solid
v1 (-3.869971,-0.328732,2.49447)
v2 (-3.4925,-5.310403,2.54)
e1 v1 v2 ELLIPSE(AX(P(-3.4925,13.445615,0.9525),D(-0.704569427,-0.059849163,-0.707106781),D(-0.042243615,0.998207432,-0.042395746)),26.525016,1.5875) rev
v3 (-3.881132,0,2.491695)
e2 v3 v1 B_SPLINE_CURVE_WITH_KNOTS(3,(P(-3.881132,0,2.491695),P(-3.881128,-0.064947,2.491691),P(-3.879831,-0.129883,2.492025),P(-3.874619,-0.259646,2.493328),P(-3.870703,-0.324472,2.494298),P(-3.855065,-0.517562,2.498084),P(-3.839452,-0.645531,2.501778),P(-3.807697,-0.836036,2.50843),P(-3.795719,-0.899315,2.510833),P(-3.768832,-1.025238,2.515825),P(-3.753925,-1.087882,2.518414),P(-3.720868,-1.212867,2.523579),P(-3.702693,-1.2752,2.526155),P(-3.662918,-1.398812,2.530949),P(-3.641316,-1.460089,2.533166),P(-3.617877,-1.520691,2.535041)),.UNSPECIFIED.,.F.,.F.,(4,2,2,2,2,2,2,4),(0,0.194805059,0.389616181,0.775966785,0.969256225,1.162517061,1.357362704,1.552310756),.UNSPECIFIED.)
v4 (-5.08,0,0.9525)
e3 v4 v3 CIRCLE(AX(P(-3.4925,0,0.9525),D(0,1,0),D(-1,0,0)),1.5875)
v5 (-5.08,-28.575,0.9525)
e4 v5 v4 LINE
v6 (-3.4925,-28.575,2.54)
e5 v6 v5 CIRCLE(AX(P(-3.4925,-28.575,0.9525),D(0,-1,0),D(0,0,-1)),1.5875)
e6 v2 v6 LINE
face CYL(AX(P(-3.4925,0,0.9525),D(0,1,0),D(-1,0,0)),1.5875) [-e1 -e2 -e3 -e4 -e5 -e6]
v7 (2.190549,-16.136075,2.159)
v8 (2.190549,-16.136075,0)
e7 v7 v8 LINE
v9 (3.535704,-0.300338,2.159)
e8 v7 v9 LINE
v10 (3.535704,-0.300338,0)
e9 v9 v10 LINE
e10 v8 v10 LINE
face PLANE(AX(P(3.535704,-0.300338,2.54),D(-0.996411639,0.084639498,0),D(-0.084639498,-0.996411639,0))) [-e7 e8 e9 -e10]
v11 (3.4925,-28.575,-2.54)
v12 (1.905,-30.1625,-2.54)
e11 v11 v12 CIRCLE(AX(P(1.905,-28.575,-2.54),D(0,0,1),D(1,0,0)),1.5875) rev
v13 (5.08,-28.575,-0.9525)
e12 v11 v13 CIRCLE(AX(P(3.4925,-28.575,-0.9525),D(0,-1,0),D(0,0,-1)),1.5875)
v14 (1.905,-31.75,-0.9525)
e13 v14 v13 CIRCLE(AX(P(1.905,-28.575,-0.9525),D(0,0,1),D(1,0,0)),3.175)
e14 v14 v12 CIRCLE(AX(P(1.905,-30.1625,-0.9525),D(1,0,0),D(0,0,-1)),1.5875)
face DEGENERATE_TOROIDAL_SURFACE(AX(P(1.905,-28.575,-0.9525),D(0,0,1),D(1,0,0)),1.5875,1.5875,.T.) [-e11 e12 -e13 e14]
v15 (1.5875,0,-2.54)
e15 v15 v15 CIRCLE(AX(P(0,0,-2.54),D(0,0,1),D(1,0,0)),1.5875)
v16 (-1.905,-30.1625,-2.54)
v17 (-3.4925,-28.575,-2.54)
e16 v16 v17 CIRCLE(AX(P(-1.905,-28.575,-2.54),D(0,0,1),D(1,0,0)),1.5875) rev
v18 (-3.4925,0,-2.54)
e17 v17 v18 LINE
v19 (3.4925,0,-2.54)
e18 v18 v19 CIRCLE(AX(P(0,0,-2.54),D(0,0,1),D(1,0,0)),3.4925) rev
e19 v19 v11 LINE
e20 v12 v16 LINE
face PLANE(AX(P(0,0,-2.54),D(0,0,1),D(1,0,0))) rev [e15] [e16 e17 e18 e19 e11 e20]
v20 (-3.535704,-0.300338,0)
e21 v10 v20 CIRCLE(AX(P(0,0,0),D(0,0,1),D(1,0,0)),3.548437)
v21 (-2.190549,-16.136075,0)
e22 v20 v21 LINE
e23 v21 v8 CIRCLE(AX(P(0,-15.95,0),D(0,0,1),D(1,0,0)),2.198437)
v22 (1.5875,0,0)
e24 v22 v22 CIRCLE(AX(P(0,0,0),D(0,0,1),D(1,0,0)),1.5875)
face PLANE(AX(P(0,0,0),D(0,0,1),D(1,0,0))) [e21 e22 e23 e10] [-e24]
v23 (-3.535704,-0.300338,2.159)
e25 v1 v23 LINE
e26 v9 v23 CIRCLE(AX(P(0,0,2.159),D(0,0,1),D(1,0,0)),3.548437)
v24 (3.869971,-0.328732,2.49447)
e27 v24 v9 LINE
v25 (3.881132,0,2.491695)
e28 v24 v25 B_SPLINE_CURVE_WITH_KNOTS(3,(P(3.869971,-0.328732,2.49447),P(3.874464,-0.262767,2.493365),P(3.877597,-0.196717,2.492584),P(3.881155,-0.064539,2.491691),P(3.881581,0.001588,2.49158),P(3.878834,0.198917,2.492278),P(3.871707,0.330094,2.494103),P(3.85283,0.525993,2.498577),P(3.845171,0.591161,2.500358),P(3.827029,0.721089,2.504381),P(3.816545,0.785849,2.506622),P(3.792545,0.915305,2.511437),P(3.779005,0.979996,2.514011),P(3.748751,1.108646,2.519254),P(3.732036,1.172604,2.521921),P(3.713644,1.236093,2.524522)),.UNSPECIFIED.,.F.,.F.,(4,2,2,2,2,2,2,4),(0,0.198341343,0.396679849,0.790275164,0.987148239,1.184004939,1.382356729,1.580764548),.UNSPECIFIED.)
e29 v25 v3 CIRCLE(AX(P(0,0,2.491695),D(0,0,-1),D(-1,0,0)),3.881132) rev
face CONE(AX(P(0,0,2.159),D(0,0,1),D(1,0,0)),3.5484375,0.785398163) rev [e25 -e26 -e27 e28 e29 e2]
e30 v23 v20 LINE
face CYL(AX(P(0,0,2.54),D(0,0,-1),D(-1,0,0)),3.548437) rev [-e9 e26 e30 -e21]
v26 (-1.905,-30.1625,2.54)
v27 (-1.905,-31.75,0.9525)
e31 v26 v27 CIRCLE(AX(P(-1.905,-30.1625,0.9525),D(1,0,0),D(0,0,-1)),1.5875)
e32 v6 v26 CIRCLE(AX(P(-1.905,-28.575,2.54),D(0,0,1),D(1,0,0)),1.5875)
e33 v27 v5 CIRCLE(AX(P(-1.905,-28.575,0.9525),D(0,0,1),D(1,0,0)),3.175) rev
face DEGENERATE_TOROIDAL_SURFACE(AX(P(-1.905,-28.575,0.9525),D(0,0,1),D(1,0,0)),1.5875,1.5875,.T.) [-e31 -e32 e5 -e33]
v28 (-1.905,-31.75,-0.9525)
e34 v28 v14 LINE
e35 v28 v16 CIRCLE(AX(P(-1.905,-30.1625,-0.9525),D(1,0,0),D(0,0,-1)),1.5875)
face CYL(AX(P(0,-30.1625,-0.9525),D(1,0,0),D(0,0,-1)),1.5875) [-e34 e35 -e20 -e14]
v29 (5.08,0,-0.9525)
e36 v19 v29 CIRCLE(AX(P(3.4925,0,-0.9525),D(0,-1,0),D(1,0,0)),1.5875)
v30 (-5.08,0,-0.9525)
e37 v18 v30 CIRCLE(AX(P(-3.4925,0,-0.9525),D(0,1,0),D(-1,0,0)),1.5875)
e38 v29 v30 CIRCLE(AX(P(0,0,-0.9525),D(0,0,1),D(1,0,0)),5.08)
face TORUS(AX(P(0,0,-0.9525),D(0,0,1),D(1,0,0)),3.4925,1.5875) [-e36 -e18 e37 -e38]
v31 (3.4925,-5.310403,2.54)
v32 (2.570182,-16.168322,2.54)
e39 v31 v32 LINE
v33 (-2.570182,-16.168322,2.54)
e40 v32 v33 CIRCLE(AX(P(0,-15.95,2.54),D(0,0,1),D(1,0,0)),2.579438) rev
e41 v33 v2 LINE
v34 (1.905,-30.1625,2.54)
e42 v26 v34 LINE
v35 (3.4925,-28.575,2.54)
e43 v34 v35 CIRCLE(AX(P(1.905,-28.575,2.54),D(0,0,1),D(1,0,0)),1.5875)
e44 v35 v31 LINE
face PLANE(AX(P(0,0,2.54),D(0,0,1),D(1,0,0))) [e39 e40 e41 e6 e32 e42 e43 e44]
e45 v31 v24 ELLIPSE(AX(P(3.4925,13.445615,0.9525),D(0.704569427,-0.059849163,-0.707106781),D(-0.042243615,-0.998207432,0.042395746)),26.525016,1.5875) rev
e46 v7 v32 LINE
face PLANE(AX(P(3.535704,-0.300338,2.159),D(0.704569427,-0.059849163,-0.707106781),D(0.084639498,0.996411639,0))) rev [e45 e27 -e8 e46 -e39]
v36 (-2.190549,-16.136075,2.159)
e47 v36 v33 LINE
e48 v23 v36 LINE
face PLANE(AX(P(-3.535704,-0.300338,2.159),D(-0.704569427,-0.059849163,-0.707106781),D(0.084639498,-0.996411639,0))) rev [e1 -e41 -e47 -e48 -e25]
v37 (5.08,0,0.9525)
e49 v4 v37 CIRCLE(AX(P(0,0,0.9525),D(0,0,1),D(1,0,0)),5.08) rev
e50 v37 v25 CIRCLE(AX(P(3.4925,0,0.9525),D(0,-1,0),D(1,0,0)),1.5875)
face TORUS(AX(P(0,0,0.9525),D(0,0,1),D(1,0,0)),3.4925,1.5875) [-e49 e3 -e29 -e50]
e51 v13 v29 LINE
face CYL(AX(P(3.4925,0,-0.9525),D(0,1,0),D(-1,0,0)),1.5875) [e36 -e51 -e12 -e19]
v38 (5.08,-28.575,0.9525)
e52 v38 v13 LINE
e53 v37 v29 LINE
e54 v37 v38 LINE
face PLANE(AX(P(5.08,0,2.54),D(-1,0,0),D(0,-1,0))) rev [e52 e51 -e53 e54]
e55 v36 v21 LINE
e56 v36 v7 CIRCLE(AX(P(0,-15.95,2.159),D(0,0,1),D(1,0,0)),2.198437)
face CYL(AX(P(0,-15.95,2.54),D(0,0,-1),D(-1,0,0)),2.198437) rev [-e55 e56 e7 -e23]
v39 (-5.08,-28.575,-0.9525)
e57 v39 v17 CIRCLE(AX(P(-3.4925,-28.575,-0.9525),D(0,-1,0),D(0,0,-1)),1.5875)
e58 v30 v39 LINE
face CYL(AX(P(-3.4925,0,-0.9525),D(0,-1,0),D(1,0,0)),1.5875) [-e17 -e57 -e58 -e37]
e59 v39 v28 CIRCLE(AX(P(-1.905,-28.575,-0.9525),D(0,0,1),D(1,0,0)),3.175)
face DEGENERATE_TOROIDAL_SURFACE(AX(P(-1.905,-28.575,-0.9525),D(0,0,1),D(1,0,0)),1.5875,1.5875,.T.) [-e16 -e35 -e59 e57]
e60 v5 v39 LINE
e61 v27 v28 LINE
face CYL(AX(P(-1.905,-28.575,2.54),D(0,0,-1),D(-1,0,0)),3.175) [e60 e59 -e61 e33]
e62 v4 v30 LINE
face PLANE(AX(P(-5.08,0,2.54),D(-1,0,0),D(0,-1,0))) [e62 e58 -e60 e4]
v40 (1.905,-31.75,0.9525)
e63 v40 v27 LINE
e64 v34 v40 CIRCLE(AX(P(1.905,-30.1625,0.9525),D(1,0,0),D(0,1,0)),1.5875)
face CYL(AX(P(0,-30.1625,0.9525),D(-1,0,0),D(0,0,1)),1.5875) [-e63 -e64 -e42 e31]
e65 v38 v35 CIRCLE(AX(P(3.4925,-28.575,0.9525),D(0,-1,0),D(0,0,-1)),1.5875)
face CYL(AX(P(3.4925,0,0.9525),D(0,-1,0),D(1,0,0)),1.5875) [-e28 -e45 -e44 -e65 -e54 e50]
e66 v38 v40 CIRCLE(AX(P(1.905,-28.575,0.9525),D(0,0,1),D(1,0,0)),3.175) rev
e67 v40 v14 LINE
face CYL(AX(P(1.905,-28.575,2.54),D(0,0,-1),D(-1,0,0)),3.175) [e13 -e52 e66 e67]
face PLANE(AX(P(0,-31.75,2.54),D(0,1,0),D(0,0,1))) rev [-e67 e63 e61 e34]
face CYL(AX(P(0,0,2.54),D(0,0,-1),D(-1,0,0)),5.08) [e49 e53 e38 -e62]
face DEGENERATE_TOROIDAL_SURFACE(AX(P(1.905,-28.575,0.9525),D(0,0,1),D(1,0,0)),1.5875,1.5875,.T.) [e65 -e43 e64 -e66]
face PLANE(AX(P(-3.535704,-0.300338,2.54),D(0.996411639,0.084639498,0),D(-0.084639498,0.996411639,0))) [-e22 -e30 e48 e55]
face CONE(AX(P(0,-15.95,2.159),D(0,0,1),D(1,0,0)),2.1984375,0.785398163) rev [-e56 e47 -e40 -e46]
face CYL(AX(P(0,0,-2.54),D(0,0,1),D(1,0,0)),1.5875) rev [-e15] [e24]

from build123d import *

# Parameters (mm, degrees)
BOSS_EXTRUDE1_DEPTH = 2.54
BOSS_EXTRUDE2_START = -2.54
SKETCH1_3_R         = 1.5875
BOSS_EXTRUDE2_DEPTH = 2.54
CHAMFER1_SIZE       = 0.381
FILLET1_R           = 1.5875


with BuildPart() as part:
    # Sketch1 → Boss-Extrude1 (new body)
    with BuildSketch(Plane.XY):
        with BuildLine():
            Line((5.08, -28.575), (5.08, 0))
            ThreePointArc((5.08, 0), (0, 5.08), (-5.08, 0))
            Line((-5.08, 0), (-5.08, -28.575))
            ThreePointArc((-5.08, -28.575), (-4.15006403, -30.82006403), (-1.905, -31.75))
            Line((-1.905, -31.75), (1.905, -31.75))
            ThreePointArc((1.905, -31.75), (4.15006403, -30.82006403), (5.08, -28.575))
        make_face()
        with BuildLine():
            Line((-3.535704427, -0.30033797), (-2.190548714, -16.136074647))
            ThreePointArc((-2.190548714, -16.136074647), (-1.487288465, -17.568981304), (0, -18.1484375))
            ThreePointArc((0, -18.1484375), (1.487288465, -17.568981304), (2.190548714, -16.136074647))
            Line((2.190548714, -16.136074647), (3.535704427, -0.30033797))
            ThreePointArc((3.535704427, -0.30033797), (0, 3.5484375), (-3.535704427, -0.30033797))
        make_face(mode=Mode.SUBTRACT)
    extrude(amount=BOSS_EXTRUDE1_DEPTH)

    # Sketch1<3> → Boss-Extrude2 (add)
    with BuildSketch(Plane.XY.offset(BOSS_EXTRUDE2_START)):
        with BuildLine():
            ThreePointArc((1.905, -31.75), (4.15006403, -30.82006403), (5.08, -28.575))
            Line((5.08, -28.575), (5.08, 0))
            ThreePointArc((5.08, 0), (0, 5.08), (-5.08, 0))
            Line((-5.08, 0), (-5.08, -28.575))
            ThreePointArc((-5.08, -28.575), (-4.15006403, -30.82006403), (-1.905, -31.75))
            Line((-1.905, -31.75), (1.905, -31.75))
        make_face()
        Circle(SKETCH1_3_R, mode=Mode.SUBTRACT)
    extrude(amount=BOSS_EXTRUDE2_DEPTH)

    # Chamfer1
    chamfer1_edges = [part.edges().sort_by_distance(p)[0] for p in [
        (0, 3.5484375, 2.54),
        (2.86312657, -8.218206309, 2.54),
        (0, -18.1484375, 2.54),
        (-2.86312657, -8.218206309, 2.54),
    ]]
    chamfer(chamfer1_edges, length=CHAMFER1_SIZE)

    # Fillet1
    # the kernel refuses this fillet: 1.5875 mm, written as the material it takes off along each edge
    with BuildSketch(Plane(origin=(1.905, -28.575, 2.54), x_dir=(0, -1, 0), z_dir=(-1, 0, 0))) as fillet1_piece_1:
        with BuildLine():
            CenterArc((3.175 - FILLET1_R, -FILLET1_R), FILLET1_R, 0, 90)
            Line((3.175, -FILLET1_R), (3.175, 0))
            Line((3.175, 0), (3.175 - FILLET1_R, 0))
        make_face()
    revolve(axis=Axis((1.905, -28.575, 2.54), (0, 0, 1)), revolution_arc=90, mode=Mode.SUBTRACT)
    with BuildSketch(Plane(origin=(-1.905, -28.575, 2.54), x_dir=(-1, 0, 0), z_dir=(0, 1, 0))) as fillet1_piece_2:
        with BuildLine():
            CenterArc((3.175 - FILLET1_R, -FILLET1_R), FILLET1_R, 0, 90)
            Line((3.175, -FILLET1_R), (3.175, 0))
            Line((3.175, 0), (3.175 - FILLET1_R, 0))
        make_face()
    revolve(axis=Axis((-1.905, -28.575, 2.54), (0, 0, 1)), revolution_arc=90, mode=Mode.SUBTRACT)
    with BuildSketch(Plane(origin=(-5.08, 0, 2.54), x_dir=(1, 0, 0), z_dir=(0, -1, 0)), Plane(origin=(-5.08, 0, -2.54), x_dir=(0, 0, 1), z_dir=(0, -1, 0)), Plane(origin=(5.08, -28.575, 2.54), x_dir=(-1, 0, 0), z_dir=(0, 1, 0)), Plane(origin=(5.08, -28.575, -2.54), x_dir=(0, 0, 1), z_dir=(0, 1, 0))) as fillet1_piece_3:
        with BuildLine():
            CenterArc((FILLET1_R, -FILLET1_R), FILLET1_R, 90, 90)
            Line((0, -FILLET1_R), (0, 0))
            Line((0, 0), (FILLET1_R, 0))
        make_face()
    extrude(amount=28.575, mode=Mode.SUBTRACT)
    with BuildSketch(Plane(origin=(1.905, -28.575, -2.54), x_dir=(0, -1, 0), z_dir=(-1, 0, 0))) as fillet1_piece_4:
        with BuildLine():
            CenterArc((3.175 - FILLET1_R, FILLET1_R), FILLET1_R, 270, 90)
            Line((3.175 - FILLET1_R, 0), (3.175, 0))
            Line((3.175, 0), (3.175, FILLET1_R))
        make_face()
    revolve(axis=Axis((1.905, -28.575, -2.54), (0, 0, 1)), revolution_arc=90, mode=Mode.SUBTRACT)
    with BuildSketch(Plane(origin=(-1.905, -28.575, -2.54), x_dir=(-1, 0, 0), z_dir=(0, 1, 0))) as fillet1_piece_5:
        with BuildLine():
            CenterArc((3.175 - FILLET1_R, FILLET1_R), FILLET1_R, 270, 90)
            Line((3.175 - FILLET1_R, 0), (3.175, 0))
            Line((3.175, 0), (3.175, FILLET1_R))
        make_face()
    revolve(axis=Axis((-1.905, -28.575, -2.54), (0, 0, 1)), revolution_arc=90, mode=Mode.SUBTRACT)
    with BuildSketch(Plane(origin=(0, 0, -2.54), x_dir=(1, 0, 0), z_dir=(0, -1, 0))) as fillet1_piece_6:
        with BuildLine():
            CenterArc((5.08 - FILLET1_R, FILLET1_R), FILLET1_R, 270, 90)
            Line((5.08 - FILLET1_R, 0), (5.08, 0))
            Line((5.08, 0), (5.08, FILLET1_R))
        make_face()
    revolve(axis=Axis((0, 0, -2.54), (0, 0, 1)), revolution_arc=180, mode=Mode.SUBTRACT)
    with BuildSketch(Plane(origin=(0, 0, 2.54), x_dir=(1, 0, 0), z_dir=(0, -1, 0))) as fillet1_piece_7:
        with BuildLine():
            CenterArc((5.08 - FILLET1_R, -FILLET1_R), FILLET1_R, 0, 90)
            Line((5.08, -FILLET1_R), (5.08, 0))
            Line((5.08, 0), (5.08 - FILLET1_R, 0))
        make_face()
    revolve(axis=Axis((0, 0, 2.54), (0, 0, 1)), revolution_arc=180, mode=Mode.SUBTRACT)
    with BuildSketch(Plane(origin=(-1.905, -31.75, 2.54), x_dir=(0, 1, 0), z_dir=(1, 0, 0)), Plane(origin=(-1.905, -31.75, -2.54), x_dir=(0, 0, 1), z_dir=(1, 0, 0))) as fillet1_piece_8:
        with BuildLine():
            CenterArc((FILLET1_R, -FILLET1_R), FILLET1_R, 90, 90)
            Line((0, -FILLET1_R), (0, 0))
            Line((0, 0), (FILLET1_R, 0))
        make_face()
    extrude(amount=3.81, mode=Mode.SUBTRACT)


solid = part.part
